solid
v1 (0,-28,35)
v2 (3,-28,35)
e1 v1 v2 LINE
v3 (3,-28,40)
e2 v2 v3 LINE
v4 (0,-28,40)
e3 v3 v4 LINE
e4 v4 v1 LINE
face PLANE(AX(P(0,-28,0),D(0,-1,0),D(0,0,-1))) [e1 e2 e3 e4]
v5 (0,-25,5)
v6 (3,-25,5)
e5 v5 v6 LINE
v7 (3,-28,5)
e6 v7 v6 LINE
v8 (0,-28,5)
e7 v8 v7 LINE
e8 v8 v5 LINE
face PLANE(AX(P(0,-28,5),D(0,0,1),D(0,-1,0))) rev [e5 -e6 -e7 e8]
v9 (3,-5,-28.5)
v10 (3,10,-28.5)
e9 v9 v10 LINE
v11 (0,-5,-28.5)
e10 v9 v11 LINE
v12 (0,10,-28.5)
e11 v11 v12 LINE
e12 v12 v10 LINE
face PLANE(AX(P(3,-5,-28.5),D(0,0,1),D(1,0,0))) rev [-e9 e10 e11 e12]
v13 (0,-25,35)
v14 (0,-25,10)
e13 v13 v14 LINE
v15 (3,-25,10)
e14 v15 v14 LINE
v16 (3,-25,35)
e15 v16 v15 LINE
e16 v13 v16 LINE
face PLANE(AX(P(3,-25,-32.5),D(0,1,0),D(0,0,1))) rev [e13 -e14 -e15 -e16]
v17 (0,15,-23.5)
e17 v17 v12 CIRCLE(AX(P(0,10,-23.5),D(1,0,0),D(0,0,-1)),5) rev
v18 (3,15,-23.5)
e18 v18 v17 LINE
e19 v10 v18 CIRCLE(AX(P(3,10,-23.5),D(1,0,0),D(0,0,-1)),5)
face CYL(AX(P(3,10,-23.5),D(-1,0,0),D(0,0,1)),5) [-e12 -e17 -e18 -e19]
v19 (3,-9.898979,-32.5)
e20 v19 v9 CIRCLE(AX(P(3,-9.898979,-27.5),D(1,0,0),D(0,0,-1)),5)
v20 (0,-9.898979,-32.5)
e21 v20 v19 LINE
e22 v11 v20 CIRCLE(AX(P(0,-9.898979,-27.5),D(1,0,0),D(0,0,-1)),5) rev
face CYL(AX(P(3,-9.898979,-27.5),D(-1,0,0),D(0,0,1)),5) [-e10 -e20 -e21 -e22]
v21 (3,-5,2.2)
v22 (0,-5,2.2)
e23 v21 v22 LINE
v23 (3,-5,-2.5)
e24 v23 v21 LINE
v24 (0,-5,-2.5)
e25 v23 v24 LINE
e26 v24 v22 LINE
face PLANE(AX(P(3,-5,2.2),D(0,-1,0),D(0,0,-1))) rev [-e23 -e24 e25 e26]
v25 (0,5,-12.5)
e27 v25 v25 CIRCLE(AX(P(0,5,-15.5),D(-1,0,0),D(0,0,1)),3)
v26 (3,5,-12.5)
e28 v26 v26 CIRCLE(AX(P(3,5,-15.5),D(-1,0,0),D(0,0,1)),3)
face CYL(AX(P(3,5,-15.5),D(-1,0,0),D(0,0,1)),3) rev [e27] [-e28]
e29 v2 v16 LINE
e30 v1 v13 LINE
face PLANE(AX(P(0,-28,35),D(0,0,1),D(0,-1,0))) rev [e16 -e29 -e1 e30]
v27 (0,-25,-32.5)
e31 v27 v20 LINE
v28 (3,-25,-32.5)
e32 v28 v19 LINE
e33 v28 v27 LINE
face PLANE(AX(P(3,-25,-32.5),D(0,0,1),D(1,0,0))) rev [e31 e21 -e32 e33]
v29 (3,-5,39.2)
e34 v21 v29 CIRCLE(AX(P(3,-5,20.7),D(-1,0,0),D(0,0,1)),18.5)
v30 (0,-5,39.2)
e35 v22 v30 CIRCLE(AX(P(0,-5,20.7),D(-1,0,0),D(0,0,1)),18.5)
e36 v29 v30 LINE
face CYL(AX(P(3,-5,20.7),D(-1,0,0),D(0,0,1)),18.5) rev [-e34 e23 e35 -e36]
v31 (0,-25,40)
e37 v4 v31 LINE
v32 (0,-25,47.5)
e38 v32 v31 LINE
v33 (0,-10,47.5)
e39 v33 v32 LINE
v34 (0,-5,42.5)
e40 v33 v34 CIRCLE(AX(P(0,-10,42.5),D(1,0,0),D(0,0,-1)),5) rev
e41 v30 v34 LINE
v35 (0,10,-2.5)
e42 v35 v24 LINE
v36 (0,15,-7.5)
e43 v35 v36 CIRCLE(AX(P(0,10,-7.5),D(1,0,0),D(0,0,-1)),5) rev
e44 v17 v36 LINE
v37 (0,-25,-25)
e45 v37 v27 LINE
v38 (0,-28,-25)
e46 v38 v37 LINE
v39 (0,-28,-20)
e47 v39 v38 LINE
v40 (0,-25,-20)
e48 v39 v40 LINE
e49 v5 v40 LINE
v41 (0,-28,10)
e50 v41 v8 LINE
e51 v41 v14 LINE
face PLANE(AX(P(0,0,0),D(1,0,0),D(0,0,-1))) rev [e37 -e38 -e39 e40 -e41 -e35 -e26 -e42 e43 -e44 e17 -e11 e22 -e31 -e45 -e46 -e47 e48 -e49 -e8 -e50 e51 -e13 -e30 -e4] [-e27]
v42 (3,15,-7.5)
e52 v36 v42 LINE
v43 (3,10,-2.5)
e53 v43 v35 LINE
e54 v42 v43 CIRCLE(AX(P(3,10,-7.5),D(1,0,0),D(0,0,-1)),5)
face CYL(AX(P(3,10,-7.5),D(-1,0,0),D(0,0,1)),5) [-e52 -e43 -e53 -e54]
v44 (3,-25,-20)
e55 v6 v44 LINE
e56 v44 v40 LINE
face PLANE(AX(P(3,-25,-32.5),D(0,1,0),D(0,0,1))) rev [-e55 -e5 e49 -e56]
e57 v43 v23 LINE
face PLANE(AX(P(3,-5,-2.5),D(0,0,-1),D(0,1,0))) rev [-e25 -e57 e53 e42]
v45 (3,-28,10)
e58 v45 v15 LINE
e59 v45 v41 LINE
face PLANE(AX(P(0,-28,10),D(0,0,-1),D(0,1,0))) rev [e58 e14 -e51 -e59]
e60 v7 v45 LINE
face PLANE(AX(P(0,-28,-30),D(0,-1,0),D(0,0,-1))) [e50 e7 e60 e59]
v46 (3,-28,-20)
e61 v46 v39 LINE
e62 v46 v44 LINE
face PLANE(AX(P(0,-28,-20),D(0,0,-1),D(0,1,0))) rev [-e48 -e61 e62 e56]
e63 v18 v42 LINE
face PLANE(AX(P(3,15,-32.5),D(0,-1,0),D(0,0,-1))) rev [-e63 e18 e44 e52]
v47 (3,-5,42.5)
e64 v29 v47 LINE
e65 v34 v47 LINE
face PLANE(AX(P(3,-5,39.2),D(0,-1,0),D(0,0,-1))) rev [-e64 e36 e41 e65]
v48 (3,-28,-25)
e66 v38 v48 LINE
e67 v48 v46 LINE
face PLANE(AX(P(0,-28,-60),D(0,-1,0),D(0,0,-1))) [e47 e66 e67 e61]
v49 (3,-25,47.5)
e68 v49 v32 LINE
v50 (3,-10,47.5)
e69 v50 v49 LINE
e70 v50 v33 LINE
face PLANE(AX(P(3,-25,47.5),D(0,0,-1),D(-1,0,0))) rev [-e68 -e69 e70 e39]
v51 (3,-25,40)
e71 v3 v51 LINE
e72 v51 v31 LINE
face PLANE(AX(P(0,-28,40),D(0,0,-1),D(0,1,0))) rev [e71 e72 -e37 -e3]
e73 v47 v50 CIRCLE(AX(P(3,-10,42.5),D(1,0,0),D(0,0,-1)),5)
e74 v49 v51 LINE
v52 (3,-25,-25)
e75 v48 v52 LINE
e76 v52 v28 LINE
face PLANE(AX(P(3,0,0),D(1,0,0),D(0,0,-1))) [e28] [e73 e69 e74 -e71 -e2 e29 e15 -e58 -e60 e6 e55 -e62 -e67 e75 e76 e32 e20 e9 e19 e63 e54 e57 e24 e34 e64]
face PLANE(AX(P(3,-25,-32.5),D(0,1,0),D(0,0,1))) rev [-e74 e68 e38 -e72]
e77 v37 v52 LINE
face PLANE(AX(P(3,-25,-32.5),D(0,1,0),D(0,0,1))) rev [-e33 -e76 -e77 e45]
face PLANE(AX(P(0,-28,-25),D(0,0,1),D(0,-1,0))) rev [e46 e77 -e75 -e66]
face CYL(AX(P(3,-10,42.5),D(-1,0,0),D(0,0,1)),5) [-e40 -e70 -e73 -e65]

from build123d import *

# Parameters (mm, degrees)
SKETCH1_W           = 80
SKETCH1_H           = 40
BOSS_EXTRUDE1_DEPTH = 3
SKETCH8_R           = 3
SKETCH8_W           = 4
SKETCH8_H           = 20
CUT_EXTRUDE4_DEPTH  = 54.761045377
FILLET1_R           = 5
SKETCH3_W           = 3
SKETCH3_H           = 5
BOSS_EXTRUDE2_DEPTH = 3
LPATTERN1_COUNT     = 3
LPATTERN1_PITCH     = 30


with BuildPart() as part:
    # Sketch1 → Boss-Extrude1 (new body)
    with BuildSketch(Plane(origin=(0, 0, 0), x_dir=(0, 0, -1), z_dir=(1, 0, 0))):
        with Locations((-7.5, -5)):
            Rectangle(SKETCH1_W, SKETCH1_H)
    extrude(amount=BOSS_EXTRUDE1_DEPTH)

    # Sketch8 → Cut-Extrude4 (cut, through all)
    with BuildSketch(Plane.ZY):
        with Locations((-15.5, 5)):
            Circle(SKETCH8_R)
        with BuildLine():
            Line((39.2, -5), (47.5, -5))
            Line((47.5, -5), (47.5, 15))
            Line((47.5, 15), (39.2, 15))
            Line((39.2, 15), (2.2, 15))
            Line((2.2, 15), (-2.5, 15))
            Line((-2.5, 15), (-2.5, -5))
            Line((-2.5, -5), (2.2, -5))
            ThreePointArc((2.2, -5), (20.7, -23.5), (39.2, -5))
        make_face()
        with Locations((-30.5, 5)):
            Rectangle(SKETCH8_W, SKETCH8_H)
    extrude(amount=-CUT_EXTRUDE4_DEPTH, mode=Mode.SUBTRACT)

    # Fillet1
    # the kernel refuses this fillet: 5 mm, written as the material it takes off along each edge
    with BuildSketch(Plane(origin=(-12.5, -5, 47.5), x_dir=(0, -1, 0), z_dir=(1, 0, 0)), Plane(origin=(-12.5, 15, -28.5), x_dir=(0, 0, 1), z_dir=(1, 0, 0))) as fillet1_piece_1:
        with BuildLine():
            CenterArc((FILLET1_R, FILLET1_R), FILLET1_R, 180, 90)
            Line((0, FILLET1_R), (-FILLET1_R * 0.02, FILLET1_R))
            Line((-FILLET1_R * 0.02, FILLET1_R), (-FILLET1_R * 0.02, -FILLET1_R * 0.02))
            Line((-FILLET1_R * 0.02, -FILLET1_R * 0.02), (FILLET1_R, -FILLET1_R * 0.02))
            Line((FILLET1_R, -FILLET1_R * 0.02), (FILLET1_R, 0))
        make_face()
    extrude(amount=28, mode=Mode.SUBTRACT)
    with BuildSketch(Plane(origin=(-12.5, 15, -2.5), x_dir=(0, 0, -1), z_dir=(1, 0, 0))) as fillet1_piece_2:
        with BuildLine():
            CenterArc((FILLET1_R, -FILLET1_R), FILLET1_R, 90, 90)
            Line((0, -FILLET1_R), (-FILLET1_R * 0.02, -FILLET1_R))
            Line((-FILLET1_R * 0.02, -FILLET1_R), (-FILLET1_R * 0.02, FILLET1_R * 0.02))
            Line((-FILLET1_R * 0.02, FILLET1_R * 0.02), (FILLET1_R, FILLET1_R * 0.02))
            Line((FILLET1_R, FILLET1_R * 0.02), (FILLET1_R, 0))
        make_face()
    extrude(amount=28, mode=Mode.SUBTRACT)
    with BuildSketch(Plane(origin=(-12.247448714, -5, -32.5), x_dir=(0, -1.5645262863012704e-12, 1.0), z_dir=(1, 0, 0))) as fillet1_piece_3:
        with BuildLine():
            CenterArc((5, 4.898979486), FILLET1_R, 180, 78.463040967)
            Line((0, 4.898979486), (-0.1, 4.898979486))
            Line((-0.1, 4.898979486), (-0.1, 0))
            Line((-0.1, 0), (0, -0.1))
            ThreePointArc((0, -0.1), (2, -0.1), (3.98, -0.09797959))
            Line((3.98, -0.09797959), (4, 0))
        make_face()
    extrude(amount=27.494897428, mode=Mode.SUBTRACT)

    # Sketch3 → Boss-Extrude2 (add)
    with BuildSketch(Plane.XZ.offset(25)):
        with Locations((1.5, 37.5)):
            Rectangle(SKETCH3_W, SKETCH3_H)
    boss_extrude2 = extrude(amount=BOSS_EXTRUDE2_DEPTH)

    # LPattern1: Boss-Extrude2 ×3
    with Locations(*[(0, 0, -i * LPATTERN1_PITCH) for i in range(1, LPATTERN1_COUNT)]):
        add(boss_extrude2)


solid = part.part
